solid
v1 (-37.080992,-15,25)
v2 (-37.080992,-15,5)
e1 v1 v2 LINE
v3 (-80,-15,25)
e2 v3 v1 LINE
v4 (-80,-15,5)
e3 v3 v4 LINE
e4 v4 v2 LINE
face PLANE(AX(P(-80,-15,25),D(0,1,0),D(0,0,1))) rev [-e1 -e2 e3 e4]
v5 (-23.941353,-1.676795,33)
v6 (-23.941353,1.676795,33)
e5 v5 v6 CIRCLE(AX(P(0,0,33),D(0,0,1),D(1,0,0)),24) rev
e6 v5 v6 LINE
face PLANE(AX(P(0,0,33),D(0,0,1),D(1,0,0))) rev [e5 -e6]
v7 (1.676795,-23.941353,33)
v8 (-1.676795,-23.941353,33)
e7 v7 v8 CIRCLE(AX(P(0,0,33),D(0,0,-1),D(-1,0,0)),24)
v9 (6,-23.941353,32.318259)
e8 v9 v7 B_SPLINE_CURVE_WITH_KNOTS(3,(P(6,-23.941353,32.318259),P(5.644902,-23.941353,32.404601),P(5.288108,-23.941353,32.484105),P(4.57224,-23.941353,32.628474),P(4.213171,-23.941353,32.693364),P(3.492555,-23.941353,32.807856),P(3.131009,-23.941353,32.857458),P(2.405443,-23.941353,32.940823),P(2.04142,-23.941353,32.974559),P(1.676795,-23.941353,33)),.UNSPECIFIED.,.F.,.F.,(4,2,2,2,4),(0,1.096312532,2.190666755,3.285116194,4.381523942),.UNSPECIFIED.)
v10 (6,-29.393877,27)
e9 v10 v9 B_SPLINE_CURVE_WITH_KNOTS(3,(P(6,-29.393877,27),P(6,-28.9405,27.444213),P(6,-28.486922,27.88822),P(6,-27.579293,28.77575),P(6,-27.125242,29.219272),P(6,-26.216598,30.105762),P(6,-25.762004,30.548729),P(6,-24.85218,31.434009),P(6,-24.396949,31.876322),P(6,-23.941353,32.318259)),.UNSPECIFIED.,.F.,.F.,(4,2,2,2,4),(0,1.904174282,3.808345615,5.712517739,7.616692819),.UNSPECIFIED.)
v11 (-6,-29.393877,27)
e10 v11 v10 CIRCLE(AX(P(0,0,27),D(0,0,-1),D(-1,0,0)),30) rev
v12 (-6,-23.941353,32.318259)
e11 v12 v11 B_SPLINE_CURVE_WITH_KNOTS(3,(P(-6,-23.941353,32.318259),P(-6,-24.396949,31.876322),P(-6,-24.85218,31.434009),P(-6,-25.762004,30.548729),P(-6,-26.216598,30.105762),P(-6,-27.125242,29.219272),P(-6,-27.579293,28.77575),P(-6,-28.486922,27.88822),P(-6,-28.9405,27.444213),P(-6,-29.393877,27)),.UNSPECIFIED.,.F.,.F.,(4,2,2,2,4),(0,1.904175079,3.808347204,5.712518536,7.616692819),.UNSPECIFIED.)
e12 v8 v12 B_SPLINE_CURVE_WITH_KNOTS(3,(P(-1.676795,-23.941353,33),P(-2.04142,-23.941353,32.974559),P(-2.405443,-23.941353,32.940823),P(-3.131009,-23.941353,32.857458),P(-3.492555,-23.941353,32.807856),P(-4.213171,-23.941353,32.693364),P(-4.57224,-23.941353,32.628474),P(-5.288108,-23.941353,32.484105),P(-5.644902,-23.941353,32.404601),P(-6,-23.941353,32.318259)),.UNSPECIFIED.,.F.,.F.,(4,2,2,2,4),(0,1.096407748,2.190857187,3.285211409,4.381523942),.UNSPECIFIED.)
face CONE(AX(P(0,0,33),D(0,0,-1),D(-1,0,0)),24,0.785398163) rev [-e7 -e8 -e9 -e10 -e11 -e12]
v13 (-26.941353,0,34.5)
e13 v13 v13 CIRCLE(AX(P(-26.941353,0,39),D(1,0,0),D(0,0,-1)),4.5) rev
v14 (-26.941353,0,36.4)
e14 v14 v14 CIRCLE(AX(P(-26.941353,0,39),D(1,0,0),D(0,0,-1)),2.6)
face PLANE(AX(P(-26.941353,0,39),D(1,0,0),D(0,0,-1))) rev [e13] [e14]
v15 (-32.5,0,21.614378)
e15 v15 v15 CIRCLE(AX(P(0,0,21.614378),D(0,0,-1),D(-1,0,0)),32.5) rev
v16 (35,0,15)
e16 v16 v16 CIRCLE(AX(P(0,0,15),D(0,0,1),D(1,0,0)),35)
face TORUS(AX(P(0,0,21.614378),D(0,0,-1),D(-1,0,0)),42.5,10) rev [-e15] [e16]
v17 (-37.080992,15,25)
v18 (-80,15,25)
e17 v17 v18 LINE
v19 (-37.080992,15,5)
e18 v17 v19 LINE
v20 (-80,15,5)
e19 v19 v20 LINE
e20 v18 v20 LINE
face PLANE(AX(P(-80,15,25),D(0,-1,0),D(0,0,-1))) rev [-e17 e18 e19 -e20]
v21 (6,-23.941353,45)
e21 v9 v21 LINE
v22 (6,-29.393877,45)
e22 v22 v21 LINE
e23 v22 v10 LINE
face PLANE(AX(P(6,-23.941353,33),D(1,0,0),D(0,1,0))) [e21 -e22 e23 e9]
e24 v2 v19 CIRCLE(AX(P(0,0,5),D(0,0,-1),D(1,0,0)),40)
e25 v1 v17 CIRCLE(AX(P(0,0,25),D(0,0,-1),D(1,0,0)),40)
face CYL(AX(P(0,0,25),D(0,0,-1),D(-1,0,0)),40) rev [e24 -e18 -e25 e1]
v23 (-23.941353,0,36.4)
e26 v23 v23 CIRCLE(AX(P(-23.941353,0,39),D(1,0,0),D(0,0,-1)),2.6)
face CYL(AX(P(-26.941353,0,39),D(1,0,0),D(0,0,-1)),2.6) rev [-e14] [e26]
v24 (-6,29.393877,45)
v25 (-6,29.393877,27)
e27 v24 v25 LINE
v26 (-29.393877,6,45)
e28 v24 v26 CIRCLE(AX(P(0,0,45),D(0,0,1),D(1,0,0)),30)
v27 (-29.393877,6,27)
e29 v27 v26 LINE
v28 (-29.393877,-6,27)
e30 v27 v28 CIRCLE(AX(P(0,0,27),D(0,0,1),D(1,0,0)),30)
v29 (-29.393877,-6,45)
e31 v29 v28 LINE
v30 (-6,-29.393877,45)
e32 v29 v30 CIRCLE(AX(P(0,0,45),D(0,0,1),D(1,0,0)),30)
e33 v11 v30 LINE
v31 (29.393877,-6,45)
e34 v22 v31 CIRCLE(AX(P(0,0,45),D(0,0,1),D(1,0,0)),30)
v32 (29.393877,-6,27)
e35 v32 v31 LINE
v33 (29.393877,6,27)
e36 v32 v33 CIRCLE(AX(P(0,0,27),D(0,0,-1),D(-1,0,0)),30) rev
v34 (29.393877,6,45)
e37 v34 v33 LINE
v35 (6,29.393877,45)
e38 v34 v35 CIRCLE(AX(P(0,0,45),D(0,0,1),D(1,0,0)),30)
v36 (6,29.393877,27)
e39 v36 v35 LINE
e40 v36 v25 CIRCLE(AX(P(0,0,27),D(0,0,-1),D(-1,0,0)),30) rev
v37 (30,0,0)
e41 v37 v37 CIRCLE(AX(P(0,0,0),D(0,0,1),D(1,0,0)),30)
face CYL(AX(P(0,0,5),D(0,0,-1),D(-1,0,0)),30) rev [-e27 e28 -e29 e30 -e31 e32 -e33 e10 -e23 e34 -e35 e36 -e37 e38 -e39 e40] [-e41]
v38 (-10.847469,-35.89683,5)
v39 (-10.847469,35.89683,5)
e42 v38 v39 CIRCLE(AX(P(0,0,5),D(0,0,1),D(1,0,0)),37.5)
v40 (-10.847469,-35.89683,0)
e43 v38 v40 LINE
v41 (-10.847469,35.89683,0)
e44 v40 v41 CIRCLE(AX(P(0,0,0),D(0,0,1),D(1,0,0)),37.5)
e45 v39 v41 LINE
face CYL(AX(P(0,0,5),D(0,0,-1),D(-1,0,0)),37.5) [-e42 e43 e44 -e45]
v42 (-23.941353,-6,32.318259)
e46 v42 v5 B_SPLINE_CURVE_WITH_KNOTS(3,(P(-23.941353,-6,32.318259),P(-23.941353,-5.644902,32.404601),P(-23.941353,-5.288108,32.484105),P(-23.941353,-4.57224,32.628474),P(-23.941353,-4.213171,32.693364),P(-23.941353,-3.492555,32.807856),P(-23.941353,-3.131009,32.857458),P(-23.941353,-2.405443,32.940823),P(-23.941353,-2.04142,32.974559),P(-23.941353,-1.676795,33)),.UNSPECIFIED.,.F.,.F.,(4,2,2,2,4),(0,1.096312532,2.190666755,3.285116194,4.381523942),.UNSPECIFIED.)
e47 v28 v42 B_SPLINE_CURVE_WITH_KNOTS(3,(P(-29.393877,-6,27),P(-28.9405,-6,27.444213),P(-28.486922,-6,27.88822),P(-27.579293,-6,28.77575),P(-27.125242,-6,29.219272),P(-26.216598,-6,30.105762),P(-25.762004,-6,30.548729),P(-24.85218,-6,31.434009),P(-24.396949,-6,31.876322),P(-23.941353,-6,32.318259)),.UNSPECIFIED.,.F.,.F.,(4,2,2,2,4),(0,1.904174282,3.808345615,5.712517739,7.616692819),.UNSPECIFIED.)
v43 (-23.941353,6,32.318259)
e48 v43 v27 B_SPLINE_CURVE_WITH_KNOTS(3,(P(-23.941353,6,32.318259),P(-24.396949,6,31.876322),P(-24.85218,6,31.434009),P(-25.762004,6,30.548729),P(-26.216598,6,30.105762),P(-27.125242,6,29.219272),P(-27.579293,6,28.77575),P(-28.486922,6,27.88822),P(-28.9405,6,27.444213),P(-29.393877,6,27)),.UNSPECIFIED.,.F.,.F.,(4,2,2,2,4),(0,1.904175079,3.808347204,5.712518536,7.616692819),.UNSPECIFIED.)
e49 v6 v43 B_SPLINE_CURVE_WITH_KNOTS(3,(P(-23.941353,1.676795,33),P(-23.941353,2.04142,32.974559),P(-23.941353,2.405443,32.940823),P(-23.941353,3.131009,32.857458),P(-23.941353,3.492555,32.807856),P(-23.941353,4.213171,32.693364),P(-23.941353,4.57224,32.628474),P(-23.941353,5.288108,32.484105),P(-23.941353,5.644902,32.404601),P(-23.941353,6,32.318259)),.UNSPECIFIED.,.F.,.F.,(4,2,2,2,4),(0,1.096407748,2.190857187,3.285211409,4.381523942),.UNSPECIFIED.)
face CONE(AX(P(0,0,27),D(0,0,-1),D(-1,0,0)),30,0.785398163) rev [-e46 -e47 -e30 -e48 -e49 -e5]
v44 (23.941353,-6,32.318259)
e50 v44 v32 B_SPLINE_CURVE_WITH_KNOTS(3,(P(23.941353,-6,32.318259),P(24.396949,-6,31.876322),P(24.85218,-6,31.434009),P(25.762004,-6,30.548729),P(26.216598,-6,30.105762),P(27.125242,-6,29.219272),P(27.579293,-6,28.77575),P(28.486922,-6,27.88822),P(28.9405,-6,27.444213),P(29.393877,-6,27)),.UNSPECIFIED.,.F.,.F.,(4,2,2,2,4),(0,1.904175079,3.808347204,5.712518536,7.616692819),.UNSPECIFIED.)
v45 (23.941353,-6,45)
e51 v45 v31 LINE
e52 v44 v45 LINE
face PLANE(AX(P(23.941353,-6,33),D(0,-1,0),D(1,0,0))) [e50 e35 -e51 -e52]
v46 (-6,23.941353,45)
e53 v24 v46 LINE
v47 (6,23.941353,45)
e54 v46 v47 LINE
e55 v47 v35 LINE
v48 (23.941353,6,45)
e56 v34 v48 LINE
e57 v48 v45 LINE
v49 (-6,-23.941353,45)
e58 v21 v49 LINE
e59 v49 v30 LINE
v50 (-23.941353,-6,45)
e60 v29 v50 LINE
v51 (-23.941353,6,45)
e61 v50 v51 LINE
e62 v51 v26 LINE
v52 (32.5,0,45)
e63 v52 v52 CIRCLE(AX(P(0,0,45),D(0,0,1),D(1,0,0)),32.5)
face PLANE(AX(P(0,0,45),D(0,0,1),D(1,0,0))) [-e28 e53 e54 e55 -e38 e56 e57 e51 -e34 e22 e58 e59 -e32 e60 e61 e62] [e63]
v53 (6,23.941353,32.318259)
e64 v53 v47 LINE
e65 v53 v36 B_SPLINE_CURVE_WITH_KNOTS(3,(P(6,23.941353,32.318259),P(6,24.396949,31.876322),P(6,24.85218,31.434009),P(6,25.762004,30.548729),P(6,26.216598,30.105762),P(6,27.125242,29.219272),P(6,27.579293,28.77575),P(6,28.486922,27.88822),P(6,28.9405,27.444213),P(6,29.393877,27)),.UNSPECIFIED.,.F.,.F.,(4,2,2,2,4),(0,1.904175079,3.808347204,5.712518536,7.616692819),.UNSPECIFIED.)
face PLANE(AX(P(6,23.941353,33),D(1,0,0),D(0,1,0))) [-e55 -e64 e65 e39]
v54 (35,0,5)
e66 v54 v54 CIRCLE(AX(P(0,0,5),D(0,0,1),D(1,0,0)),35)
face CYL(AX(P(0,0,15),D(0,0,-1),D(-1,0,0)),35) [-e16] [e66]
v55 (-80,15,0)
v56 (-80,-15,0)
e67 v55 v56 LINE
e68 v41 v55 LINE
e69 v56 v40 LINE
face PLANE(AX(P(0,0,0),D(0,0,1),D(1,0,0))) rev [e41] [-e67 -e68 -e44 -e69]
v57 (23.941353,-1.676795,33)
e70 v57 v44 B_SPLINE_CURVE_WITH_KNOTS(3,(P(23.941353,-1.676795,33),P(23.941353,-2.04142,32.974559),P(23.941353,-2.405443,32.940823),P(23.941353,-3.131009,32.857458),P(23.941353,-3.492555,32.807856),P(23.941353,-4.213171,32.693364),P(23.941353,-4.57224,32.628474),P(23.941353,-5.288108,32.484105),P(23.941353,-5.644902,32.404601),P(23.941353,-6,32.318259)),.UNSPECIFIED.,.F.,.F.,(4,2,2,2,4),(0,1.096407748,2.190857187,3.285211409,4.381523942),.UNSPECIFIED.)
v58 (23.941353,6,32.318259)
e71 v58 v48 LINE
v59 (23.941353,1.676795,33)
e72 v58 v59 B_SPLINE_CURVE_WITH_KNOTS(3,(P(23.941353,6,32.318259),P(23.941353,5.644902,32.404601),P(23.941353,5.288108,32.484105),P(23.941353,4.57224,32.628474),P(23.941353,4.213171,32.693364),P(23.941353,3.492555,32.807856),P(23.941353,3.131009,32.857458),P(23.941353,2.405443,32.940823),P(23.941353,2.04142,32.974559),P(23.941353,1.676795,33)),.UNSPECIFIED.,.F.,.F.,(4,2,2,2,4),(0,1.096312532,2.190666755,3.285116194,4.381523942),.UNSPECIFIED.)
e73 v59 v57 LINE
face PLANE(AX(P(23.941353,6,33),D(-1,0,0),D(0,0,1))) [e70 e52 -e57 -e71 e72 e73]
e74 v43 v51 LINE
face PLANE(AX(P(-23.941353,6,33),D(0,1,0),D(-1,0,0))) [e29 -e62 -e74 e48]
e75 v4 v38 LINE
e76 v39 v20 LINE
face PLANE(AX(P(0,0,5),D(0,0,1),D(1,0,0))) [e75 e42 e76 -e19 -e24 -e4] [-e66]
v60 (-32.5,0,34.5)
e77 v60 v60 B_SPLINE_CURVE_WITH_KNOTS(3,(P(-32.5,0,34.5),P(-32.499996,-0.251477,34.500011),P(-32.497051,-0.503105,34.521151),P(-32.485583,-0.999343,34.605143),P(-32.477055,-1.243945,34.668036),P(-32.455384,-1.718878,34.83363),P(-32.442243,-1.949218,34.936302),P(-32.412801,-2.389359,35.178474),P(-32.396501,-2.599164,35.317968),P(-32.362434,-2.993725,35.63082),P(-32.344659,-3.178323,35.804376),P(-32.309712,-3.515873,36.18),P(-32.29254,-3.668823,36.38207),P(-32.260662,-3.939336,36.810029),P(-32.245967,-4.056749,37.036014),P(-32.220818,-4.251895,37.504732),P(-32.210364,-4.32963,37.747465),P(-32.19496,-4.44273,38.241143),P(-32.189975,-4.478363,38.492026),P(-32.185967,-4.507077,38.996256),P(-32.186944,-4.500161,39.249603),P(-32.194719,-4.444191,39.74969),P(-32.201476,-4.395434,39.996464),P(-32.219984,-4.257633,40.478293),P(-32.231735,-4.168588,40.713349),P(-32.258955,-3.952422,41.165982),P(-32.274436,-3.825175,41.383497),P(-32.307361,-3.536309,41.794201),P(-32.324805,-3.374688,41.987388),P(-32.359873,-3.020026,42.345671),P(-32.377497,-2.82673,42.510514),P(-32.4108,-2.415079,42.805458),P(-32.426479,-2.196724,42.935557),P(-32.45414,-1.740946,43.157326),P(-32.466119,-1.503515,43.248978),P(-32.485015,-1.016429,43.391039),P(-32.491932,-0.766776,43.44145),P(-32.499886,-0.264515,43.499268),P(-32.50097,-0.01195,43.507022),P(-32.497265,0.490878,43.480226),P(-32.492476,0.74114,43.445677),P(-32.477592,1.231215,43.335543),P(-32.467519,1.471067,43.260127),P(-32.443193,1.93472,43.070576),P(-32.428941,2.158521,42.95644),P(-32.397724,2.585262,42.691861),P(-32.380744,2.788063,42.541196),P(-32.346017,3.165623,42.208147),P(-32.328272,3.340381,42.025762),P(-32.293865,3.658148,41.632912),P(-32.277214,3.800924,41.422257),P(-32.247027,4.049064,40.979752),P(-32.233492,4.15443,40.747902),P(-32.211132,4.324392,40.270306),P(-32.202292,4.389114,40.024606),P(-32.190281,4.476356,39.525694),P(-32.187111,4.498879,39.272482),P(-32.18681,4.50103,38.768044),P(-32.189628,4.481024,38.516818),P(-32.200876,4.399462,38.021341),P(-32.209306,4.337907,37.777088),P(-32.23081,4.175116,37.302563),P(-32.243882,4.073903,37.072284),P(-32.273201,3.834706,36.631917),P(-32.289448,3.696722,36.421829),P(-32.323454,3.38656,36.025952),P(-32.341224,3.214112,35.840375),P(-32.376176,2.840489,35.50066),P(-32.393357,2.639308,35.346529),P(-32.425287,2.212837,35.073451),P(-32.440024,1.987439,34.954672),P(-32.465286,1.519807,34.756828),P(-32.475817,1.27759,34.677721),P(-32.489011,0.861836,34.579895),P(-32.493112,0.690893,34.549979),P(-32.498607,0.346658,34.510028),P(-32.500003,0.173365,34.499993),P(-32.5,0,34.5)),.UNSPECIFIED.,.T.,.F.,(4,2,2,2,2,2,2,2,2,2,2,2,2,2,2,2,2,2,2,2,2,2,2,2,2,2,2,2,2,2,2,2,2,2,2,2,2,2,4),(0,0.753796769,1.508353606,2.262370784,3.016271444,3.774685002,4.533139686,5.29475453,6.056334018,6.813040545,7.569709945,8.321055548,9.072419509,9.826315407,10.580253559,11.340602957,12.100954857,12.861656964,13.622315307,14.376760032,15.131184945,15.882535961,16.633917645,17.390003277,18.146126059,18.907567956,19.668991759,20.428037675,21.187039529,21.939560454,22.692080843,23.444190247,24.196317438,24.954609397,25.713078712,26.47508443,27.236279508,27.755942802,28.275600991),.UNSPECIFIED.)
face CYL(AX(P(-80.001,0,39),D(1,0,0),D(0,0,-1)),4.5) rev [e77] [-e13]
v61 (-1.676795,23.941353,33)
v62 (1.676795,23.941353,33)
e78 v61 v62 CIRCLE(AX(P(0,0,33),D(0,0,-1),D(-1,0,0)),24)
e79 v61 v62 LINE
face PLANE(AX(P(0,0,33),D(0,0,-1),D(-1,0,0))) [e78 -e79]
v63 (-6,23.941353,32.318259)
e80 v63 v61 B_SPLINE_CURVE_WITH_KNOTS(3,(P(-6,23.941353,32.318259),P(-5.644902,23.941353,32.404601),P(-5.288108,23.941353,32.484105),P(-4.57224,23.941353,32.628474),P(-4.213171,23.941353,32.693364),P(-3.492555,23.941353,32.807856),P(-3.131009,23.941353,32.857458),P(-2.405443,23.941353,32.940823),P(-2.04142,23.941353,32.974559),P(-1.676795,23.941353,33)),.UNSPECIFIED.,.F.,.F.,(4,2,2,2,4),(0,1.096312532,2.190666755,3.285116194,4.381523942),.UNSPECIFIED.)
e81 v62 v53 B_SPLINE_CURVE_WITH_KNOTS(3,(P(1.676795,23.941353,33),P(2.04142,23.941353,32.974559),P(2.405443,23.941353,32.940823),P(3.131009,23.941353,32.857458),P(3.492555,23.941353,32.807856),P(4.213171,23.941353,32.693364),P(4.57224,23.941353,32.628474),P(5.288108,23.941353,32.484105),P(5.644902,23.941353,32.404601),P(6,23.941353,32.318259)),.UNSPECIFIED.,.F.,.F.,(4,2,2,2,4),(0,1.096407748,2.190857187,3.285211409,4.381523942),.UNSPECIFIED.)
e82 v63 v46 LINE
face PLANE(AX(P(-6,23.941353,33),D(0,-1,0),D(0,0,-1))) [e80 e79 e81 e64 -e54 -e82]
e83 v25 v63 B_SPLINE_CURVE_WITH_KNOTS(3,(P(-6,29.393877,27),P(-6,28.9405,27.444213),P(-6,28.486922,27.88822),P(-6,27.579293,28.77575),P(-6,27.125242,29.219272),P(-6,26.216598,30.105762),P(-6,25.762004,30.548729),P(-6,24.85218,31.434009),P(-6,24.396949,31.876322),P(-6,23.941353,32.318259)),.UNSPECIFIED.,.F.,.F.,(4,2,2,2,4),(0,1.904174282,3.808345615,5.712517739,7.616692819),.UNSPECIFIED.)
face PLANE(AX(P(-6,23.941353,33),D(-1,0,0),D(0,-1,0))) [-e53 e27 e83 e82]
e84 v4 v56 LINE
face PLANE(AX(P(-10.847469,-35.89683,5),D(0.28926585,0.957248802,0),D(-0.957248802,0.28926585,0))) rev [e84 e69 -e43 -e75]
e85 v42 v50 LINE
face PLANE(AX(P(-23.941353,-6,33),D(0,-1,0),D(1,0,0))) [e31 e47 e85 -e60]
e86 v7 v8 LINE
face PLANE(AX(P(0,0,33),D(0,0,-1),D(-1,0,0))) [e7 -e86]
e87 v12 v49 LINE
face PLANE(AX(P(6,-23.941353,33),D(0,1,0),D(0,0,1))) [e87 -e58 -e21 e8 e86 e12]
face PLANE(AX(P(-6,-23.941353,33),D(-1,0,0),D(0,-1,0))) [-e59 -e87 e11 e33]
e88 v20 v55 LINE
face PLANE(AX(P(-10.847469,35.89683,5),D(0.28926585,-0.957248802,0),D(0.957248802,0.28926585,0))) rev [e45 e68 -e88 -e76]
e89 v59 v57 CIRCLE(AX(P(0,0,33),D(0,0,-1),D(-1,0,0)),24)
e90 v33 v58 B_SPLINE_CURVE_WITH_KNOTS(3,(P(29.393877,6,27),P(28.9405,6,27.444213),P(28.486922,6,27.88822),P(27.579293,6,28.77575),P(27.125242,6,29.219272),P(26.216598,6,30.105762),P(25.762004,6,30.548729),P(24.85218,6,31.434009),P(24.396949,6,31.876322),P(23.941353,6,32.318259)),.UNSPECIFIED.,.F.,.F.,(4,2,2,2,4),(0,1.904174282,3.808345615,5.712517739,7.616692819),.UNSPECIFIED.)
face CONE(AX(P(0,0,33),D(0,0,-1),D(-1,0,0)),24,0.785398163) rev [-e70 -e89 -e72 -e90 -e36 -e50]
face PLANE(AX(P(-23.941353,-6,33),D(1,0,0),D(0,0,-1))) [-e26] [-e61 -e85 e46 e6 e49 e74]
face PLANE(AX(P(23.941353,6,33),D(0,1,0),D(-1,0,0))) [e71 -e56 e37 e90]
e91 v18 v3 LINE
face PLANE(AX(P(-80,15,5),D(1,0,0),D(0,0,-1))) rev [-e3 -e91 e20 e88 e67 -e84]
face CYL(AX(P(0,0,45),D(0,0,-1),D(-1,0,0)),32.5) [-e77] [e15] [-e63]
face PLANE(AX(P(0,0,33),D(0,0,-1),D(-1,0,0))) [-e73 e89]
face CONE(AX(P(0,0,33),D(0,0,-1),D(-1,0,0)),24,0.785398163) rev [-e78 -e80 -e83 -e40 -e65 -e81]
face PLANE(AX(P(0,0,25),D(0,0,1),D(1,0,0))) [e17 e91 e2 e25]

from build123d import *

# Parameters (mm, degrees)
ESQUISSE1_R                  = 30
BOSS_EXTRU_1_DEPTH           = 5
ESQUISSE6_R                  = 35
ESQUISSE6_R_2                = 30
BOSS_EXTRU_6_DEPTH           = 10
ESQUISSE7_R                  = 32.5
ESQUISSE7_R_2                = 30
BOSS_EXTRU_8_DEPTH           = 30
CONG_2_R                     = 10
BOSS_EXTRU_9_DEPTH           = 20
ESQUISSE9_W                  = 8
ESQUISSE9_H                  = 12
ESQUISSE9_W_2                = 12
ESQUISSE9_H_2                = 8
BOSS_EXTRU_10_DEPTH          = 12
CHANFREIN1_SIZE              = 6
ENL_V_MAT_EXTRU_1_REACH      = 86.89
ENL_V_MAT_EXTRU_1_END_RADIUS = 32.5
ESQUISSE10_R                 = 4.5
ESQUISSE12_R                 = 4.5
ESQUISSE12_R_2               = 2.6
BOSS_EXTRU_11_DEPTH          = 3


with BuildPart() as part:
    # Esquisse1 → Boss.-Extru.1 (new body)
    with BuildSketch(Plane.XY):
        with BuildLine():
            Line((-10.847469364, 35.896830061), (-80, 15))
            Line((-80, 15), (-80, -15))
            Line((-80, -15), (-10.847469364, -35.896830061))
            ThreePointArc((-10.847469364, -35.896830061), (37.5, 0), (-10.847469364, 35.896830061))
        make_face()
        Circle(ESQUISSE1_R, mode=Mode.SUBTRACT)
    extrude(amount=BOSS_EXTRU_1_DEPTH)

    # Esquisse6 → Boss.-Extru.6 (add)
    with BuildSketch(Plane.XY.offset(5)):
        Circle(ESQUISSE6_R)
        Circle(ESQUISSE6_R_2, mode=Mode.SUBTRACT)
    extrude(amount=BOSS_EXTRU_6_DEPTH)

    # Esquisse7 → Boss.-Extru.8 (add)
    with BuildSketch(Plane.XY.offset(15)):
        Circle(ESQUISSE7_R)
        Circle(ESQUISSE7_R_2, mode=Mode.SUBTRACT)
    extrude(amount=BOSS_EXTRU_8_DEPTH)

    # Congé2
    # the kernel refuses this fillet: 10 mm, written as the material it adds along each edge
    with BuildSketch(Plane(origin=(0, 0, 15), x_dir=(1, 0, 0), z_dir=(0, -1, 0))) as cong_2_piece_1:
        with BuildLine():
            CenterArc((42.5, 6.614378278), CONG_2_R, 180, 41.409622109)
            Line((32.5, 6.614378278), (32.3, 6.614378278))
            Line((32.3, 6.614378278), (32.3, 0))
            Line((32.3, 0), (32.5, -0.2))
            ThreePointArc((32.5, -0.2), (33.75, -0.2), (34.85, -0.132287566))
            Line((34.85, -0.132287566), (35, 0))
        make_face()
    revolve(axis=Axis((0, 0, 15), (0, 0, 1)))

    # Esquisse8 → Boss.-Extru.9 (add)
    with BuildSketch(Plane.XY.offset(5)):
        with BuildLine():
            Line((-80, 15), (-37.080992435, 15))
            ThreePointArc((-37.080992435, 15), (-40, 0), (-37.080992435, -15))
            Line((-37.080992435, -15), (-80, -15))
            Line((-80, -15), (-80, 15))
        make_face()
    extrude(amount=BOSS_EXTRU_9_DEPTH)

    # Esquisse9 → Boss.-Extru.10 (add)
    with BuildSketch(Plane.XY.offset(45)):
        with Locations((-27.941352507, 0)):
            Rectangle(ESQUISSE9_W, ESQUISSE9_H)
        with Locations((0, 27.941352507)):
            Rectangle(ESQUISSE9_W_2, ESQUISSE9_H_2)
        with Locations((27.941352507, 0)):
            Rectangle(ESQUISSE9_W, ESQUISSE9_H)
        with Locations((0, -27.941352507)):
            Rectangle(ESQUISSE9_W_2, ESQUISSE9_H_2)
    extrude(amount=-BOSS_EXTRU_10_DEPTH)

    # Chanfrein1
    # the kernel refuses this chamfer: 6 mm, written as the material it adds along each edge
    with BuildSketch(Plane(origin=(0, 0, 33), x_dir=(-0.6561519302770997, 0.75462881232672, 0), z_dir=(-0.75462881232672, -0.6561519302770997, 0))) as chanfrein1_piece_1_section:
        Polygon((30, CHANFREIN1_SIZE), (30 - CHANFREIN1_SIZE, 0), (30, 0), align=None)
    chanfrein1_piece_1 = revolve(axis=Axis((0, 0, 33), (0, 0, -1)), revolution_arc=82.01410645, mode=Mode.PRIVATE)
    chanfrein1_piece_1 = split(chanfrein1_piece_1, bisect_by=Plane(origin=(-6, 27.82841678, 31.008979001), z_dir=(1, 0, 0)), keep=Keep.TOP, mode=Mode.PRIVATE)
    chanfrein1_piece_1 = split(chanfrein1_piece_1, bisect_by=Plane(origin=(6, 27.82841678, 31.008979001), z_dir=(-1, 0, 0)), keep=Keep.TOP, mode=Mode.PRIVATE)
    chanfrein1_piece_1 = split(chanfrein1_piece_1, bisect_by=Plane(origin=(0, 23.941352507, 31.008979001), z_dir=(0, 1, 0)), keep=Keep.TOP, mode=Mode.PRIVATE)
    add(chanfrein1_piece_1)
    with BuildSketch(Plane(origin=(0, 0, 33), x_dir=(0.754635493716526, 0.6561442460490032, 0), z_dir=(-0.6561442460490032, 0.754635493716526, 0))) as chanfrein1_piece_2_section:
        Polygon((30, CHANFREIN1_SIZE), (30 - CHANFREIN1_SIZE, 0), (30, 0), align=None)
    chanfrein1_piece_2 = revolve(axis=Axis((0, 0, 33), (0, 0, -1)), revolution_arc=41.006469797, mode=Mode.PRIVATE)
    chanfrein1_piece_2 = split(chanfrein1_piece_2, bisect_by=Plane(origin=(27.828416771, 6, 31.008979004), z_dir=(0, -1, 0)), keep=Keep.TOP, mode=Mode.PRIVATE)
    chanfrein1_piece_2 = split(chanfrein1_piece_2, bisect_by=Plane(origin=(23.941352507, 3.002348554, 31.008979004), z_dir=(1, 0, 0)), keep=Keep.TOP, mode=Mode.PRIVATE)
    add(chanfrein1_piece_2)
    with BuildSketch(Plane(origin=(0, 0, 33), x_dir=(0.6561519302770998, -0.7546288123267199, 0), z_dir=(0.7546288123267199, 0.6561519302770998, 0))) as chanfrein1_piece_3_section:
        Polygon((30, CHANFREIN1_SIZE), (30 - CHANFREIN1_SIZE, 0), (30, 0), align=None)
    chanfrein1_piece_3 = revolve(axis=Axis((0, 0, 33), (0, 0, -1)), revolution_arc=82.01410645, mode=Mode.PRIVATE)
    chanfrein1_piece_3 = split(chanfrein1_piece_3, bisect_by=Plane(origin=(6, -27.82841678, 31.008979001), z_dir=(-1, 0, 0)), keep=Keep.TOP, mode=Mode.PRIVATE)
    chanfrein1_piece_3 = split(chanfrein1_piece_3, bisect_by=Plane(origin=(-6, -27.82841678, 31.008979001), z_dir=(1, 0, 0)), keep=Keep.TOP, mode=Mode.PRIVATE)
    chanfrein1_piece_3 = split(chanfrein1_piece_3, bisect_by=Plane(origin=(0, -23.941352507, 31.008979001), z_dir=(0, -1, 0)), keep=Keep.TOP, mode=Mode.PRIVATE)
    add(chanfrein1_piece_3)
    with BuildSketch(Plane(origin=(0, 0, 33), x_dir=(-0.7546288123267202, -0.6561519302770997, 0), z_dir=(0.6561519302770997, -0.7546288123267202, 0))) as chanfrein1_piece_4_section:
        Polygon((30, CHANFREIN1_SIZE), (30 - CHANFREIN1_SIZE, 0), (30, 0), align=None)
    chanfrein1_piece_4 = revolve(axis=Axis((0, 0, 33), (0, 0, -1)), revolution_arc=82.01410645, mode=Mode.PRIVATE)
    chanfrein1_piece_4 = split(chanfrein1_piece_4, bisect_by=Plane(origin=(-27.82841678, -6, 31.008979), z_dir=(0, 1, 0)), keep=Keep.TOP, mode=Mode.PRIVATE)
    chanfrein1_piece_4 = split(chanfrein1_piece_4, bisect_by=Plane(origin=(-27.82841678, 6, 31.008979), z_dir=(0, -1, 0)), keep=Keep.TOP, mode=Mode.PRIVATE)
    chanfrein1_piece_4 = split(chanfrein1_piece_4, bisect_by=Plane(origin=(-23.941352507, 0, 31.008979), z_dir=(-1, 0, 0)), keep=Keep.TOP, mode=Mode.PRIVATE)
    add(chanfrein1_piece_4)
    with BuildSketch(Plane(origin=(0, 0, 33), x_dir=(1, 0, 0), z_dir=(0, 1, 0))) as chanfrein1_piece_5_section:
        Polygon((30, CHANFREIN1_SIZE), (30 - CHANFREIN1_SIZE, 0), (30, 0), align=None)
    chanfrein1_piece_5 = revolve(axis=Axis((0, 0, 33), (0, 0, -1)), revolution_arc=41.006469797, mode=Mode.PRIVATE)
    chanfrein1_piece_5 = split(chanfrein1_piece_5, bisect_by=Plane(origin=(27.828416774, -6, 31.008979003), z_dir=(0, 1, 0)), keep=Keep.TOP, mode=Mode.PRIVATE)
    chanfrein1_piece_5 = split(chanfrein1_piece_5, bisect_by=Plane(origin=(23.941352507, -3.002348554, 31.008979003), z_dir=(1, 0, 0)), keep=Keep.TOP, mode=Mode.PRIVATE)
    add(chanfrein1_piece_5)

    # Enlèv. mat.-Extru.1: up to this cylinder (the profile starts inside it)
    enl_v_mat_extru_1_end = Plane(origin=(0, 0, 39), z_dir=(0, 0, -1)) * Cylinder(ENL_V_MAT_EXTRU_1_END_RADIUS, 239.78, mode=Mode.PRIVATE)
    # Esquisse10 → Enlèv. mat.-Extru.1 (cut, up to the surface)
    with BuildSketch(Plane(origin=(-23.941352507, 0, 0), x_dir=(0, 0, -1), z_dir=(1, 0, 0)), mode=Mode.PRIVATE) as enl_v_mat_extru_1_sk1:
        with Locations((-39, 0)):
            Circle(ESQUISSE10_R)
    enl_v_mat_extru_1_tool1 = extrude(enl_v_mat_extru_1_sk1.sketch, amount=-ENL_V_MAT_EXTRU_1_REACH, mode=Mode.PRIVATE) & enl_v_mat_extru_1_end
    add(enl_v_mat_extru_1_tool1.solids().sort_by_distance((-23.941353, 0, 39))[0], mode=Mode.SUBTRACT)

    # Esquisse12 → Boss.-Extru.11 (add)
    with BuildSketch(Plane(origin=(-23.941352507, 0, 0), x_dir=(0, 0, -1), z_dir=(1, 0, 0))):
        with Locations((-39, 0)):
            Circle(ESQUISSE12_R)
        with Locations((-39, 0)):
            Circle(ESQUISSE12_R_2, mode=Mode.SUBTRACT)
    extrude(amount=-BOSS_EXTRU_11_DEPTH)


solid = part.part
